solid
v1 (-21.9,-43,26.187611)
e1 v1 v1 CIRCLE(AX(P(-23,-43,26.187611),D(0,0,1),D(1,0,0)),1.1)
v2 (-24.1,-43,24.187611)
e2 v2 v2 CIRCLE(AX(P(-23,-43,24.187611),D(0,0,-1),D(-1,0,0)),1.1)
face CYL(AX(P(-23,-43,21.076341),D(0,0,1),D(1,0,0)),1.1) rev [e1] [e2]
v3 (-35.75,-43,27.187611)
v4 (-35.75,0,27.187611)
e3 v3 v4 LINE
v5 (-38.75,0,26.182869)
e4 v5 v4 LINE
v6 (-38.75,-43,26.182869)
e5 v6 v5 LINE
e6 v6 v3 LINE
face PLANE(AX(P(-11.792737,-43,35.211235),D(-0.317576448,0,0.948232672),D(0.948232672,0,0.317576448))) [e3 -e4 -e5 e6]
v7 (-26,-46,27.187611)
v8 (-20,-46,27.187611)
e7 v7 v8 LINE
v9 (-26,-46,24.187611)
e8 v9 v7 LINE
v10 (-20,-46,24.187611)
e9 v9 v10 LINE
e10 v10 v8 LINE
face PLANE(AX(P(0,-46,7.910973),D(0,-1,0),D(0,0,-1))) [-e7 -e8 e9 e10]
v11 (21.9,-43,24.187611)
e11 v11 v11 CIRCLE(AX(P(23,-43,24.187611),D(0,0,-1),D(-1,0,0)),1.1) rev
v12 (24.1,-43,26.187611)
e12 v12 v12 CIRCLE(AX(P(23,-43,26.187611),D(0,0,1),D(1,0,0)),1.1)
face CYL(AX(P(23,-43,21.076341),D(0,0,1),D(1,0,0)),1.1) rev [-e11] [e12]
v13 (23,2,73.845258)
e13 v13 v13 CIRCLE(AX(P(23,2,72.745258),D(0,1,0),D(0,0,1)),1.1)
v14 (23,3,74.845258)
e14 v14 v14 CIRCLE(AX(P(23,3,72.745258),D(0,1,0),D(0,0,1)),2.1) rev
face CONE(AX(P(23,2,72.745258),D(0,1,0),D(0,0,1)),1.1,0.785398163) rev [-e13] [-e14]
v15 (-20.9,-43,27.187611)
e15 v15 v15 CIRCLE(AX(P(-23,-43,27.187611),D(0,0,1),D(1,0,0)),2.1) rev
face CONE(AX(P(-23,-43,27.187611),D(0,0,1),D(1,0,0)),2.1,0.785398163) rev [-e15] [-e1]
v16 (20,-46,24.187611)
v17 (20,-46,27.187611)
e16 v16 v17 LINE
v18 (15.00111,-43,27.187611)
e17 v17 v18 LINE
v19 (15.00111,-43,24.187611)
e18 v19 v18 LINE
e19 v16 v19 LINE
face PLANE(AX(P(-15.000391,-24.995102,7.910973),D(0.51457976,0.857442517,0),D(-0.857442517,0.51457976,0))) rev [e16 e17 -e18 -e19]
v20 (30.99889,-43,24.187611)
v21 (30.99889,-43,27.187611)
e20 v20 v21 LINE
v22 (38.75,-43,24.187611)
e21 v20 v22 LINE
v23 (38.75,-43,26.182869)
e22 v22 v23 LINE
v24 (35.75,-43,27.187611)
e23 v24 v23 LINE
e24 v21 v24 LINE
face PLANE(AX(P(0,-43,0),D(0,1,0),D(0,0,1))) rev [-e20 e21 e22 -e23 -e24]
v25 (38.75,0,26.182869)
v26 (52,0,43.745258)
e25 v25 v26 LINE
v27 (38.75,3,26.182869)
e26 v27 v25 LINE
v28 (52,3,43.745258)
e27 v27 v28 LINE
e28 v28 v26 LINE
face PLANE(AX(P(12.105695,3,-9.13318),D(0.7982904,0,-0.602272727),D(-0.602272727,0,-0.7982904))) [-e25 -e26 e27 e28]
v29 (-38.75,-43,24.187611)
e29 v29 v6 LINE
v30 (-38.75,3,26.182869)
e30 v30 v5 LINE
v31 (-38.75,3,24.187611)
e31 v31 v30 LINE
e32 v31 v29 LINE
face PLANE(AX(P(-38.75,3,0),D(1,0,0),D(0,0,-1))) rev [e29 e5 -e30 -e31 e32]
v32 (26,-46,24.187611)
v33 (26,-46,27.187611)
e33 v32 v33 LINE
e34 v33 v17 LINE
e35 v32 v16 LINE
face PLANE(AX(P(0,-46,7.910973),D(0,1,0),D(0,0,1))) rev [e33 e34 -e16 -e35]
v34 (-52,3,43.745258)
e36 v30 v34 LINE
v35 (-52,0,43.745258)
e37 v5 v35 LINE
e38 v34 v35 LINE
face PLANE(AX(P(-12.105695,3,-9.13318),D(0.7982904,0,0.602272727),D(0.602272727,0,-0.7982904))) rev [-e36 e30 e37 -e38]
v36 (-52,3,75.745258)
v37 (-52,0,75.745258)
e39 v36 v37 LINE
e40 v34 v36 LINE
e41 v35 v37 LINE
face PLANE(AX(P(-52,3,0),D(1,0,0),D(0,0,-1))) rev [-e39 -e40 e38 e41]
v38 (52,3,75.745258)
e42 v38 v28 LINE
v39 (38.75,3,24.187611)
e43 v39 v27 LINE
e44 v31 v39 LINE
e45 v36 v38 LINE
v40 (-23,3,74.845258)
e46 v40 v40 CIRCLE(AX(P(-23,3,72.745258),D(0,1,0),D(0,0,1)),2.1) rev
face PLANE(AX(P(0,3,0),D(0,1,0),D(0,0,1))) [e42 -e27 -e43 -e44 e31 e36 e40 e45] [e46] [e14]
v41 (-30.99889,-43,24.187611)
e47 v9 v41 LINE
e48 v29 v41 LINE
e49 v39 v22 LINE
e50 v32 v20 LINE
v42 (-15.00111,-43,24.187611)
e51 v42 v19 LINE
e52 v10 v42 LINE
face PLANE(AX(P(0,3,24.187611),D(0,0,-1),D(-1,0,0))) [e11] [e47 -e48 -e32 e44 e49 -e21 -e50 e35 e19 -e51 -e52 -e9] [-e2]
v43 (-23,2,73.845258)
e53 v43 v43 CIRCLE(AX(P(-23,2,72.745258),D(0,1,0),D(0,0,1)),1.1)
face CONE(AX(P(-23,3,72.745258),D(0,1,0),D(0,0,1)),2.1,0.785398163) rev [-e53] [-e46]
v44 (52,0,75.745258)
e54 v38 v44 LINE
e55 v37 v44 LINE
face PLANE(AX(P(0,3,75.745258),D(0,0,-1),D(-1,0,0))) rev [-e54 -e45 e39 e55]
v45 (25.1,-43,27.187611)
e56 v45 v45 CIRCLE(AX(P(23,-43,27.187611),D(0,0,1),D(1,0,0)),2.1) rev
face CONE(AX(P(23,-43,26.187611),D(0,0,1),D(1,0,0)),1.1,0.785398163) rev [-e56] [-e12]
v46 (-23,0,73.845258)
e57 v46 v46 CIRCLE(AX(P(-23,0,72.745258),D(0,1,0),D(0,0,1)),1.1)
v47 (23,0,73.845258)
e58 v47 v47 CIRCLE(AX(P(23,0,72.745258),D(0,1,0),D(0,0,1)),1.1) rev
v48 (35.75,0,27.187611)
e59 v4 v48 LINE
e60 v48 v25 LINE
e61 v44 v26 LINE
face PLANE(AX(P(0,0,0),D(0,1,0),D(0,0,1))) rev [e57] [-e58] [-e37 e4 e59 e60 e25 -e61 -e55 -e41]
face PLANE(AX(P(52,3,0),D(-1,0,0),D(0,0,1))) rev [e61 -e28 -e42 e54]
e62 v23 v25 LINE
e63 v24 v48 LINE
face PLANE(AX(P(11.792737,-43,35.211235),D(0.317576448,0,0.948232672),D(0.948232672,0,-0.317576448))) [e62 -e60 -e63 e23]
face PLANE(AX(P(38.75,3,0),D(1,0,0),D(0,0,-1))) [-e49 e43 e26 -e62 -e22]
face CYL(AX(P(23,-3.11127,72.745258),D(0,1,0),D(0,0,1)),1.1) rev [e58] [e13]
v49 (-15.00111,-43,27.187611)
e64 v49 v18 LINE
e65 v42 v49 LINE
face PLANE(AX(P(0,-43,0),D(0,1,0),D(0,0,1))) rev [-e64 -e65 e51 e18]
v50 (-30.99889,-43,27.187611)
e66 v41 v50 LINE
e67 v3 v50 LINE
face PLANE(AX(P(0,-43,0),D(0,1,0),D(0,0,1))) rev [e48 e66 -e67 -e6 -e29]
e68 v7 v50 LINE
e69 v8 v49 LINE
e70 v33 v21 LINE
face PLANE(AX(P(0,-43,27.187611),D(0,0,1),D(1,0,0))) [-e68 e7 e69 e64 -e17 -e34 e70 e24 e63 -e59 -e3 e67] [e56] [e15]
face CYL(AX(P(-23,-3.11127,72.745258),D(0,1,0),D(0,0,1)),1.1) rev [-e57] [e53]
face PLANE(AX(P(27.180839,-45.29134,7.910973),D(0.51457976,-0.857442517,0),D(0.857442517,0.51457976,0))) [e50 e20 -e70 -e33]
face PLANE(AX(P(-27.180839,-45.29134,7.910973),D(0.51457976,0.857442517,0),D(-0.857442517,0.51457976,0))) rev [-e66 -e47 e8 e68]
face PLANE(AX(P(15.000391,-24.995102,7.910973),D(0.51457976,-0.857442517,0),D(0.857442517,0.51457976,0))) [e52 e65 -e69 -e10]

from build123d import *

# Parameters (mm, degrees)
DODANIE_WYCI_GNI_CIE1_DEPTH = 3
DODANIE_WYCI_GNI_CIE2_DEPTH = 43
DODANIE_WYCI_GNI_CIE3_DEPTH = 3
WYTNIJ_WYCI_GNI_CIE2_DEPTH  = 3
SZKIC3_R                    = 1.1
WYTNIJ_WYCI_GNI_CIE3_DEPTH  = 3
SFAZOWANIE1_SIZE            = 1
SFAZOWANIE2_SIZE            = 1


with BuildPart() as part:
    # Szkic1 → Dodanie-wyciągnięcie1 (new body)
    with BuildSketch(Plane(origin=(0, 0, 0), x_dir=(1, 0, 0), z_dir=(0, 1, 0))):
        Polygon((-35.75, -27.18761121), (-38.75, -26.182869049), (-52, -43.745257839), (-52, -75.745257839), (52, -75.745257839), (52, -43.745257839), (38.75, -26.182869049), (35.75, -27.18761121), align=None)
        Polygon((38.75, -24.18761121), (-38.75, -24.18761121), (-38.75, -26.182869049), (-35.75, -27.18761121), (35.75, -27.18761121), (38.75, -26.182869049), align=None)
    extrude(amount=DODANIE_WYCI_GNI_CIE1_DEPTH)

    # Szkic1<3> → Dodanie-wyciągnięcie2 (add)
    with BuildSketch(Plane(origin=(0, 0, 0), x_dir=(1, 0, 0), z_dir=(0, 1, 0))):
        Polygon((38.75, -24.18761121), (-38.75, -24.18761121), (-38.75, -26.182869049), (-35.75, -27.18761121), (35.75, -27.18761121), (38.75, -26.182869049), align=None)
    extrude(amount=-DODANIE_WYCI_GNI_CIE2_DEPTH)

    # Szkic2 → Dodanie-wyciągnięcie3 (add)
    with BuildSketch(Plane.XY.offset(27.18761121)):
        with BuildLine():
            Line((-26, -46), (-20, -46))
            Line((-20, -46), (-20, -43))
            Line((-20, -43), (-21.9, -43))
            ThreePointArc((-21.9, -43), (-23, -44.1), (-24.1, -43))
            Line((-24.1, -43), (-26, -43))
            Line((-26, -43), (-26, -46))
        make_face()
        with BuildLine():
            ThreePointArc((-24.1, -43), (-23, -44.1), (-21.9, -43))
            Line((-21.9, -43), (-24.1, -43))
        make_face()
        with BuildLine():
            Line((-24.1, -43), (-21.9, -43))
            ThreePointArc((-21.9, -43), (-23, -41.9), (-24.1, -43))
        make_face()
        with BuildLine():
            Line((20, -46), (26, -46))
            Line((26, -46), (26, -43))
            Line((26, -43), (24.1, -43))
            ThreePointArc((24.1, -43), (23, -44.1), (21.9, -43))
            Line((21.9, -43), (20, -43))
            Line((20, -43), (20, -46))
        make_face()
        with BuildLine():
            ThreePointArc((21.9, -43), (23, -44.1), (24.1, -43))
            Line((24.1, -43), (21.9, -43))
        make_face()
        with BuildLine():
            Line((21.9, -43), (24.1, -43))
            ThreePointArc((24.1, -43), (23, -41.9), (21.9, -43))
        make_face()
        Polygon((-30.998889877, -43), (-26, -46), (-26, -43), align=None)
        Polygon((-20, -46), (-15.001110123, -43), (-20, -43), align=None)
        Polygon((15.001110123, -43), (20, -46), (20, -43), align=None)
        Polygon((26, -43), (26, -46), (30.998889877, -43), align=None)
    extrude(amount=-DODANIE_WYCI_GNI_CIE3_DEPTH)

    # Szkic2<4> → Wytnij-wyciągnięcie2 (cut)
    with BuildSketch(Plane.XY.offset(27.18761121)):
        with BuildLine():
            ThreePointArc((-24.1, -43), (-23, -44.1), (-21.9, -43))
            Line((-21.9, -43), (-24.1, -43))
        make_face()
        with BuildLine():
            Line((-24.1, -43), (-21.9, -43))
            ThreePointArc((-21.9, -43), (-23, -41.9), (-24.1, -43))
        make_face()
        with BuildLine():
            ThreePointArc((21.9, -43), (23, -44.1), (24.1, -43))
            Line((24.1, -43), (21.9, -43))
        make_face()
        with BuildLine():
            Line((21.9, -43), (24.1, -43))
            ThreePointArc((24.1, -43), (23, -41.9), (21.9, -43))
        make_face()
    extrude(amount=-WYTNIJ_WYCI_GNI_CIE2_DEPTH, mode=Mode.SUBTRACT)

    # Szkic3 → Wytnij-wyciągnięcie3 (cut)
    with BuildSketch(Plane(origin=(0, 3, 0), x_dir=(1, 0, 0), z_dir=(0, 1, 0))):
        with Locations(Location((-23, -72.745257839, 0), (0, 0, 270))):
            Circle(SZKIC3_R)
        with Locations(Location((23, -72.745257839, 0), (0, 0, 270))):
            Circle(SZKIC3_R)
    extrude(amount=-WYTNIJ_WYCI_GNI_CIE3_DEPTH, mode=Mode.SUBTRACT)

    # Sfazowanie1
    sfazowanie1_edges = [part.edges().sort_by_distance(p)[0] for p in [
        (-23, 3, 71.645257839),
    ]]
    chamfer(sfazowanie1_edges, length=SFAZOWANIE1_SIZE)

    # Sfazowanie2
    sfazowanie2_edges = [part.edges().sort_by_distance(p)[0] for p in [
        (23, 3, 71.645257839),
    ]]
    chamfer(sfazowanie2_edges, length=SFAZOWANIE2_SIZE)

    # Sfazowanie3: read off the stored shape, not the designer's step
    # Sfazowanie3 outline → Sfazowanie3 (revolve, cut)
    with BuildSketch(Plane(origin=(23, -43, 0), x_dir=(1, 0, 0), z_dir=(0, -1, 0))):
        Polygon((1.1, 27.18761121), (1.1, 26.18761121), (2.1, 27.18761121), align=None)
    revolve(axis=Axis((23, -43, 0), (0, 0, 1)), mode=Mode.SUBTRACT)

    # Sfazowanie4: read off the stored shape, not the designer's step
    # Sfazowanie4 outline → Sfazowanie4 (revolve, cut)
    with BuildSketch(Plane(origin=(-23, -43, 0), x_dir=(1, 0, 0), z_dir=(0, -1, 0))):
        Polygon((1.1, 27.18761121), (1.1, 26.18761121), (2.1, 27.18761121), align=None)
    revolve(axis=Axis((-23, -43, 0), (0, 0, 1)), mode=Mode.SUBTRACT)


solid = part.part
